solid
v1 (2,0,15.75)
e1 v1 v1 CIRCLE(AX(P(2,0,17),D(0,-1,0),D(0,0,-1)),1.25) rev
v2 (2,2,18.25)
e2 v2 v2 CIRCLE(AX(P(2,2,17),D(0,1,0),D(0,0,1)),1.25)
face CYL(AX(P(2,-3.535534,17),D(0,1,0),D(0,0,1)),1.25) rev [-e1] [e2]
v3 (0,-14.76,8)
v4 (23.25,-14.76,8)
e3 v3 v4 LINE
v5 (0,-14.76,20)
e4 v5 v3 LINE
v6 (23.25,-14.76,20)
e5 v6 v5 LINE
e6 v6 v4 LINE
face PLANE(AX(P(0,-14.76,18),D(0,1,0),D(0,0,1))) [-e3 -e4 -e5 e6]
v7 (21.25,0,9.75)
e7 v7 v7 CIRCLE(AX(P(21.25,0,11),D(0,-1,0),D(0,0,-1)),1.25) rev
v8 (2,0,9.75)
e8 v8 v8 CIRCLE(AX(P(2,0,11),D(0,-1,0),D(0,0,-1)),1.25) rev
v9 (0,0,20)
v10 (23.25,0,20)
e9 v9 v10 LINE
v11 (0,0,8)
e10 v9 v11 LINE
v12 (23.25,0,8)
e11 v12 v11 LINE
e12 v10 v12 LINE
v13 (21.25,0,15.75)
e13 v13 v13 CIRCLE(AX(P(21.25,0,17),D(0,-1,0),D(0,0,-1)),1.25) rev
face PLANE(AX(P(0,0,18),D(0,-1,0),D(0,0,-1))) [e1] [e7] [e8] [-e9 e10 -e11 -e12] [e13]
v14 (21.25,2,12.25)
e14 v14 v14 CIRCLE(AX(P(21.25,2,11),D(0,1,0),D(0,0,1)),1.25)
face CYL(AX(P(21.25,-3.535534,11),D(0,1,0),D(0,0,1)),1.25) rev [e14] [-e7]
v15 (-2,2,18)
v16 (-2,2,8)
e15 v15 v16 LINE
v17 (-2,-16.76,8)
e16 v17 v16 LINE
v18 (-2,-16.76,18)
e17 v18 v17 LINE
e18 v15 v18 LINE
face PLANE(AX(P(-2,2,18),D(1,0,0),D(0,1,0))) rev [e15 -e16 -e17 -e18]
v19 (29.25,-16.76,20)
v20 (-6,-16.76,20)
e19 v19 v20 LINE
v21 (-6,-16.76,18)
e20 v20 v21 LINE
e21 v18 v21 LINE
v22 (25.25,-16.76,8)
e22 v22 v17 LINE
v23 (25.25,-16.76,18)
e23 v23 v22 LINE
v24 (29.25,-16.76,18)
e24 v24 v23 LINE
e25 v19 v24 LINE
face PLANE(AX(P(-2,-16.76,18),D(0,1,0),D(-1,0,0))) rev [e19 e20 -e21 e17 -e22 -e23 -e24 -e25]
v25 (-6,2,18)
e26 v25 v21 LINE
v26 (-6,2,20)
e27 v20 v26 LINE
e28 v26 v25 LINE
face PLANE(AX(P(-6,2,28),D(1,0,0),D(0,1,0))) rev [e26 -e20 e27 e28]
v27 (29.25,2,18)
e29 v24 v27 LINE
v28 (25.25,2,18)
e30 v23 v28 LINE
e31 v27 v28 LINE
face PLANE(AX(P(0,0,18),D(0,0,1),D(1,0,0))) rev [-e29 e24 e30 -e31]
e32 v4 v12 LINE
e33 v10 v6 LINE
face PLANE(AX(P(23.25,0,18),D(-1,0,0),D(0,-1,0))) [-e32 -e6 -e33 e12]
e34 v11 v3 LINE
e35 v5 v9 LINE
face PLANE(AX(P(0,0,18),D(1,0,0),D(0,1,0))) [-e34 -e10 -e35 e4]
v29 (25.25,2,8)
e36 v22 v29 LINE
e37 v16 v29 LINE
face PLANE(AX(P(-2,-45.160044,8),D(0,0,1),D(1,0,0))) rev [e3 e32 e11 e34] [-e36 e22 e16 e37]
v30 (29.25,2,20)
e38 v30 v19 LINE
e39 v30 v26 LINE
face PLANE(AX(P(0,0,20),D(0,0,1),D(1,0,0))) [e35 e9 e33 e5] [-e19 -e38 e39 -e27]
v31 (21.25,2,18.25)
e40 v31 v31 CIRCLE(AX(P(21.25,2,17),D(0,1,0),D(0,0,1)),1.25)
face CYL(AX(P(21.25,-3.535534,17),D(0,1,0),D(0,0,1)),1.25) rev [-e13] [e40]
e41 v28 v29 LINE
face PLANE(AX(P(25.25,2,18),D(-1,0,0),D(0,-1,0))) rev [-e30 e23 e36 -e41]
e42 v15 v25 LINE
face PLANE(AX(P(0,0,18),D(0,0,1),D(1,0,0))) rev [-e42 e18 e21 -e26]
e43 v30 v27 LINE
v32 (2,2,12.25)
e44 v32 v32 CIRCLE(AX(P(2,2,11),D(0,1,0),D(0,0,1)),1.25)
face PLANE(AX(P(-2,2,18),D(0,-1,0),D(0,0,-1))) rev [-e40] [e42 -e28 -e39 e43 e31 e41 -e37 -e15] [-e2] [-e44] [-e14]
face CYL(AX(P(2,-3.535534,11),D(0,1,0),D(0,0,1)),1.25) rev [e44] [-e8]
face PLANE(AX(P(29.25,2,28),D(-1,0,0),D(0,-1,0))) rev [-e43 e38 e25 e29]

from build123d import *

# Parameters (mm, degrees)
SKETCH1_W            = 27.25
SKETCH1_H            = 18.76
SKETCH1_W_2          = 23.25
SKETCH1_H_2          = 14.76
BOSS_EXTRUDE1_DEPTH  = 18
SKETCH3_W            = 23.25
SKETCH3_H            = 14.76
BOSS_EXTRUDE2_DEPTH  = 2
SKETCH7_W            = 2
SKETCH7_H            = 5
CUT_EXTRUDE1_DEPTH   = 2
SKETCH10_W           = 23.25
SKETCH10_H           = 14.76
SKETCH10_W_2         = 7
SKETCH10_H_2         = 18.76
BOSS_EXTRUDE3_DEPTH  = 2
SKETCH11_R           = 1.5
CUT_EXTRUDE3_DEPTH   = 2
SKETCH12_R           = 1.5
CUT_EXTRUDE4_DEPTH   = 2
FILLET11_R           = 1
SKETCH13_W           = 3
SKETCH13_H           = 18.76
CUT_EXTRUDE5_DEPTH   = 10
CUT_EXTRUDE6_REACH   = 42.094
SKETCH14_W           = 27.25
SKETCH14_H           = 8
SKETCH16_W           = 23.25
SKETCH16_H           = 2
BOSS_EXTRUDE5_DEPTH  = 7.6
SKETCH19_W           = 2
SKETCH19_H           = 0.99
CUT_EXTRUDE8_DEPTH   = 10
BOSS_EXTRUDE6_DEPTH  = 4
SKETCH21_R           = 1.25
CUT_EXTRUDE9_DEPTH   = 2
BOSS_EXTRUDE7_DEPTH  = 1
CUT_EXTRUDE11_START  = -12
CUT_EXTRUDE11_DEPTH  = 12
SKETCH26_W           = 28.086287418
SKETCH26_H           = 15.375704791
CUT_EXTRUDE13_DEPTH  = 4
SKETCH27_W           = 24.075870352
SKETCH27_H           = 3.872197668
CUT_EXTRUDE14_DEPTH  = 12
SKETCH28_W           = 5.439700639
SKETCH28_H           = 5.036759851
BOSS_EXTRUDE8_DEPTH  = 2
SKETCH29_R           = 1.25
CUT_EXTRUDE15_DEPTH  = 2
SKETCH30_W           = 2
SKETCH30_H           = 0.99
BOSS_EXTRUDE9_DEPTH  = 10
SKETCH32_W           = 3.854176667
SKETCH32_H           = 5.494251846
SKETCH32_W_2         = 4.510206738
SKETCH32_H_2         = 5.863268761
BOSS_EXTRUDE11_DEPTH = 2
BOSS_EXTRUDE13_START = -2
BOSS_EXTRUDE13_DEPTH = 2


with BuildPart() as part:
    # Sketch1 → Boss-Extrude1 (new body)
    with BuildSketch(Plane.XY):
        with Locations((11.625, -7.38)):
            Rectangle(SKETCH1_W, SKETCH1_H)
        with Locations((11.625, -7.38)):
            Rectangle(SKETCH1_W_2, SKETCH1_H_2, mode=Mode.SUBTRACT)
    extrude(amount=BOSS_EXTRUDE1_DEPTH)

    # Sketch3 → Boss-Extrude2 (add)
    with BuildSketch(Plane(origin=(0, 0, 0), x_dir=(-1, 0, 0), z_dir=(0, 0, -1))):
        with Locations((-11.625, -7.38)):
            Rectangle(SKETCH3_W, SKETCH3_H)
    extrude(amount=-BOSS_EXTRUDE2_DEPTH)

    # Sketch7 → Cut-Extrude1 (cut)
    with BuildSketch(Plane.ZY.offset(2)):
        with Locations((3, -6.5)):
            Rectangle(SKETCH7_W, SKETCH7_H)
    extrude(amount=-CUT_EXTRUDE1_DEPTH, mode=Mode.SUBTRACT)

    # Sketch10 → Boss-Extrude3 (add)
    # profile 1 of 3: a face of its own
    with BuildSketch(Plane.XY.offset(18)):
        Polygon((-2, -0.03961342), (-2, 2), (-9, 2), (-9, -16.76), (-2, -16.76), (-2, -13.03961342), align=None)
    # profile 2 of 3: a face of its own
    with BuildSketch(Plane.XY.offset(18)):
        Polygon((25.25, 2), (-2, 2), (-2, -0.03961342), (-2, -13.03961342), (-2, -16.76), (25.25, -16.76), align=None)
        with Locations((11.625, -7.38)):
            Rectangle(SKETCH10_W, SKETCH10_H, mode=Mode.SUBTRACT)
    # profile 3 of 3: a face of its own
    with BuildSketch(Plane.XY.offset(18)):
        with Locations((28.75, -7.38)):
            Rectangle(SKETCH10_W_2, SKETCH10_H_2)
    extrude(amount=BOSS_EXTRUDE3_DEPTH)

    # Sketch11 → Cut-Extrude3 (cut)
    with BuildSketch(Plane(origin=(0, 0, 18), x_dir=(-1, 0, 0), z_dir=(0, 0, -1))):
        with Locations((3.5, -8.26)):
            Circle(SKETCH11_R)
    extrude(amount=-CUT_EXTRUDE3_DEPTH, mode=Mode.SUBTRACT)

    # Sketch12 → Cut-Extrude4 (cut)
    with BuildSketch(Plane(origin=(0, 0, 18), x_dir=(-1, 0, 0), z_dir=(0, 0, -1))):
        with Locations((-26.95, -8.26)):
            Circle(SKETCH12_R)
    extrude(amount=-CUT_EXTRUDE4_DEPTH, mode=Mode.SUBTRACT)

    # Fillet11
    fillet11_edges = [part.edges().sort_by_distance(p)[0] for p in [
        (0, -9, 3),
        (0, -4, 3),
        (0, -6.5, 4),
        (-2, -6.5, 4),
        (-2, -4, 3),
        (-2, -9, 3),
    ]]
    fillet(fillet11_edges, radius=FILLET11_R - 0.0001)  # a hair under: the kernel refuses the full size

    # Sketch13 → Cut-Extrude5 (cut)
    with BuildSketch(Plane(origin=(0, 0, 18), x_dir=(-1, 0, 0), z_dir=(0, 0, -1))):
        with Locations((-30.75, -7.38)):
            Rectangle(SKETCH13_W, SKETCH13_H)
        with Locations((7.5, -7.38)):
            Rectangle(SKETCH13_W, SKETCH13_H)
    extrude(amount=-CUT_EXTRUDE5_DEPTH, mode=Mode.SUBTRACT)

    # Cut-Extrude6: up to this face of the body (flat: up to its plane)
    cut_extrude6_end = Plane(part.part.faces().sort_by_distance((11.625, -16.76, 10.256684492))[0])
    # Sketch14 → Cut-Extrude6 (cut, up to the picked face)
    with BuildSketch(Plane(origin=(0, 2, 0), x_dir=(1, 0, 0), z_dir=(0, 1, 0)), mode=Mode.PRIVATE) as cut_extrude6_sk1:
        with Locations((11.625, -4)):
            Rectangle(SKETCH14_W, SKETCH14_H)
    cut_extrude6_tool1 = split(extrude(cut_extrude6_sk1.sketch, amount=-CUT_EXTRUDE6_REACH, mode=Mode.PRIVATE), bisect_by=cut_extrude6_end, keep=Keep.BOTH, mode=Mode.PRIVATE)
    add(cut_extrude6_tool1.solids().sort_by(Axis((11.625, 2, 4), (0, -1, 0)))[0], mode=Mode.SUBTRACT)

    # Sketch16 → Boss-Extrude5 (add)
    with BuildSketch(Plane.XY.offset(20)):
        with Locations((11.625, -15.76)):
            Rectangle(SKETCH16_W, SKETCH16_H)
    extrude(amount=BOSS_EXTRUDE5_DEPTH)

    # Sketch19 → Cut-Extrude8 (cut)
    with BuildSketch(Plane(origin=(0, 0, 8), x_dir=(-1, 0, 0), z_dir=(0, 0, -1))):
        with Locations((1, -7.255)):
            Rectangle(SKETCH19_W, SKETCH19_H)
        with Locations((-24.25, -7.255)):
            Rectangle(SKETCH19_W, SKETCH19_H)
    extrude(amount=-CUT_EXTRUDE8_DEPTH, mode=Mode.SUBTRACT)

    # Sketch20 → Boss-Extrude6 (add)
    with BuildSketch(Plane.XZ.offset(16.76)):
        with BuildLine():
            ThreePointArc((1.734487906, 14.866457564), (-0.15, 17.000000025), (1.734487955, 19.133542442))
            Line((1.734487955, 19.133542442), (4.661486136, 19.497797339))
            ThreePointArc((4.661486136, 19.497797339), (3.240091566, 20.432881138), (1.549246975, 20.622060423))
            ThreePointArc((1.549246975, 20.622060423), (0.742054746, 20.4263791), (0, 20.053276928))
            Line((0, 20.053276928), (0, 20))
            Line((0, 20), (-0.079062289, 20))
            ThreePointArc((-0.079062289, 20), (-1.544419903, 16.128456799), (1.549246968, 13.377939578))
            ThreePointArc((1.549246968, 13.377939578), (3.240091563, 13.567118861), (4.661486136, 14.502202661))
            Line((4.661486136, 14.502202661), (1.734487906, 14.866457564))
        make_face()
        with BuildLine():
            ThreePointArc((1.549246975, 20.622060423), (3.240091566, 20.432881138), (4.661486136, 19.497797339))
            Line((4.661486136, 19.497797339), (14.257253364, 20.691957699))
            ThreePointArc((14.257253364, 20.691957699), (15.89224684, 22.015782374), (17.896084422, 22.656368345))
            Line((17.896084422, 22.656368345), (1.549246975, 20.622060423))
        make_face()
        with BuildLine():
            ThreePointArc((17.896084422, 22.656368345), (15.89224684, 22.015782374), (14.257253364, 20.691957699))
            Line((14.257253364, 20.691957699), (18.081325153, 21.167850334))
            ThreePointArc((18.081325153, 21.167850334), (21.380428532, 20.14789091), (22.8, 17))
            ThreePointArc((22.8, 17), (21.380428595, 13.852109147), (18.081325321, 12.832149645))
            Line((18.081325321, 12.832149645), (14.257253364, 13.308042301))
            ThreePointArc((14.257253364, 13.308042301), (15.89224684, 11.984217626), (17.896084422, 11.343631655))
            ThreePointArc((17.896084422, 11.343631655), (22.37343883, 12.727862432), (24.3, 17))
            ThreePointArc((24.3, 17), (24.082512903, 18.559503854), (23.446648326, 20))
            Line((23.446648326, 20), (23.25, 20))
            Line((23.25, 20), (23.25, 20.296589146))
            ThreePointArc((23.25, 20.296589146), (20.898920406, 22.215837897), (17.896084422, 22.656368345))
        make_face()
        with BuildLine():
            Line((14.257253364, 13.308042301), (4.661486136, 14.502202661))
            ThreePointArc((4.661486136, 14.502202661), (3.240091563, 13.567118861), (1.549246968, 13.377939578))
            Line((1.549246968, 13.377939578), (17.896084422, 11.343631655))
            ThreePointArc((17.896084422, 11.343631655), (15.89224684, 11.984217626), (14.257253364, 13.308042301))
        make_face()
    extrude(amount=BOSS_EXTRUDE6_DEPTH)

    # Sketch21 → Cut-Extrude9 (cut)
    with BuildSketch(Plane.XZ.offset(16.76)):
        with Locations((18.6, 17)):
            Circle(SKETCH21_R)
    extrude(amount=-CUT_EXTRUDE9_DEPTH, mode=Mode.SUBTRACT)

    # Sketch23 → Boss-Extrude7 (add)
    with BuildSketch(Plane.XZ.offset(16.76)):
        Polygon((11.1, 21.100651295), (0.406174607, 19.998863224), (-0.954500861, 17.320033397), (0.387681288, 14.425953139), (11.1, 12.86779769), align=None)
    extrude(amount=BOSS_EXTRUDE7_DEPTH)

    # Sketch24 → Cut-Extrude11 (cut)
    with BuildSketch(Plane.XZ.offset(16.76).offset(CUT_EXTRUDE11_START)):
        with BuildLine():
            ThreePointArc((0, 20.053276928), (0.742054739, 20.426379098), (1.549246961, 20.622060422))
            Line((1.549246961, 20.622060422), (17.896084422, 22.656368345))
            ThreePointArc((17.896084422, 22.656368345), (20.898920406, 22.215837897), (23.25, 20.296589146))
            Line((23.25, 20.296589146), (23.25, 27.6))
            Line((23.25, 27.6), (0, 27.6))
            Line((0, 27.6), (0, 20.053276928))
        make_face()
    extrude(amount=CUT_EXTRUDE11_DEPTH, mode=Mode.SUBTRACT)

    # Sketch26 → Cut-Extrude13 (cut)
    with BuildSketch(Plane.XZ.offset(20.76)):
        with Locations((10.743459592, 18.384139078)):
            Rectangle(SKETCH26_W, SKETCH26_H)
    extrude(amount=-CUT_EXTRUDE13_DEPTH, mode=Mode.SUBTRACT)

    # Sketch27 → Cut-Extrude14 (cut)
    with BuildSketch(Plane(origin=(0, -16.76, 0), x_dir=(-1, 0, 0), z_dir=(0, -1, 0))):
        with Locations((-12.037935176, -21.936098834)):
            Rectangle(SKETCH27_W, SKETCH27_H)
    extrude(amount=-CUT_EXTRUDE14_DEPTH, mode=Mode.SUBTRACT)

    # Sketch28 → Boss-Extrude8 (add)
    with BuildSketch(Plane.XZ.offset(16.76)):
        with Locations((19.018963462, 16.417644729)):
            Rectangle(SKETCH28_W, SKETCH28_H)
    extrude(amount=-BOSS_EXTRUDE8_DEPTH)

    # Sketch29 → Cut-Extrude15 (cut)
    with BuildSketch(Plane(origin=(0, 2, 0), x_dir=(1, 0, 0), z_dir=(0, 1, 0))):
        with Locations(Location((2, -11, 0), (0, 0, 270))):
            Circle(SKETCH29_R)
        with Locations(Location((21.25, -11, 0), (0, 0, 270))):
            Circle(SKETCH29_R)
        with Locations(Location((2, -17, 0), (0, 0, 270))):
            Circle(SKETCH29_R)
        with Locations(Location((21.25, -17, 0), (0, 0, 270))):
            Circle(SKETCH29_R)
    extrude(amount=-CUT_EXTRUDE15_DEPTH, mode=Mode.SUBTRACT)

    # Sketch30 → Boss-Extrude9 (add)
    with BuildSketch(Plane(origin=(0, 0, 18), x_dir=(-1, 0, 0), z_dir=(0, 0, -1))):
        with Locations((-24.25, -7.255)):
            Rectangle(SKETCH30_W, SKETCH30_H)
        with Locations((1, -7.255)):
            Rectangle(SKETCH30_W, SKETCH30_H)
    extrude(amount=BOSS_EXTRUDE9_DEPTH)

    # Sketch32 → Boss-Extrude11 (add)
    with BuildSketch(Plane.XY.offset(20)):
        with Locations((-3.545695394, -6.231493422)):
            Rectangle(SKETCH32_W, SKETCH32_H)
        with Locations((26.590685996, -6.046984965)):
            Rectangle(SKETCH32_W_2, SKETCH32_H_2)
    extrude(amount=-BOSS_EXTRUDE11_DEPTH)

    # Sketch33 → Boss-Extrude13 (add)
    with BuildSketch(Plane.XY.offset(20).offset(BOSS_EXTRUDE13_START)):
        with BuildLine():
            Line((-2.183342779, -8.978619345), (-2.848663443, -8.978619345))
            Line((-2.848663443, -8.978619345), (-2.848663443, -9.611207123))
            ThreePointArc((-2.848663443, -9.611207123), (-2.466418023, -9.347064073), (-2.183342779, -8.978619345))
        make_face()
        with BuildLine():
            Line((-2.848663443, -9.611207123), (-2.848663443, -8.978619345))
            Line((-2.848663443, -8.978619345), (-4.816657221, -8.978619345))
            ThreePointArc((-4.816657221, -8.978619345), (-3.959025839, -9.688038963), (-2.848663443, -9.611207123))
        make_face()
        with BuildLine():
            ThreePointArc((28.266657221, -8.978619345), (26.95, -9.76), (25.633342779, -8.978619345))
            Line((25.633342779, -8.978619345), (28.266657221, -8.978619345))
        make_face()
    extrude(amount=BOSS_EXTRUDE13_DEPTH)


solid = part.part
